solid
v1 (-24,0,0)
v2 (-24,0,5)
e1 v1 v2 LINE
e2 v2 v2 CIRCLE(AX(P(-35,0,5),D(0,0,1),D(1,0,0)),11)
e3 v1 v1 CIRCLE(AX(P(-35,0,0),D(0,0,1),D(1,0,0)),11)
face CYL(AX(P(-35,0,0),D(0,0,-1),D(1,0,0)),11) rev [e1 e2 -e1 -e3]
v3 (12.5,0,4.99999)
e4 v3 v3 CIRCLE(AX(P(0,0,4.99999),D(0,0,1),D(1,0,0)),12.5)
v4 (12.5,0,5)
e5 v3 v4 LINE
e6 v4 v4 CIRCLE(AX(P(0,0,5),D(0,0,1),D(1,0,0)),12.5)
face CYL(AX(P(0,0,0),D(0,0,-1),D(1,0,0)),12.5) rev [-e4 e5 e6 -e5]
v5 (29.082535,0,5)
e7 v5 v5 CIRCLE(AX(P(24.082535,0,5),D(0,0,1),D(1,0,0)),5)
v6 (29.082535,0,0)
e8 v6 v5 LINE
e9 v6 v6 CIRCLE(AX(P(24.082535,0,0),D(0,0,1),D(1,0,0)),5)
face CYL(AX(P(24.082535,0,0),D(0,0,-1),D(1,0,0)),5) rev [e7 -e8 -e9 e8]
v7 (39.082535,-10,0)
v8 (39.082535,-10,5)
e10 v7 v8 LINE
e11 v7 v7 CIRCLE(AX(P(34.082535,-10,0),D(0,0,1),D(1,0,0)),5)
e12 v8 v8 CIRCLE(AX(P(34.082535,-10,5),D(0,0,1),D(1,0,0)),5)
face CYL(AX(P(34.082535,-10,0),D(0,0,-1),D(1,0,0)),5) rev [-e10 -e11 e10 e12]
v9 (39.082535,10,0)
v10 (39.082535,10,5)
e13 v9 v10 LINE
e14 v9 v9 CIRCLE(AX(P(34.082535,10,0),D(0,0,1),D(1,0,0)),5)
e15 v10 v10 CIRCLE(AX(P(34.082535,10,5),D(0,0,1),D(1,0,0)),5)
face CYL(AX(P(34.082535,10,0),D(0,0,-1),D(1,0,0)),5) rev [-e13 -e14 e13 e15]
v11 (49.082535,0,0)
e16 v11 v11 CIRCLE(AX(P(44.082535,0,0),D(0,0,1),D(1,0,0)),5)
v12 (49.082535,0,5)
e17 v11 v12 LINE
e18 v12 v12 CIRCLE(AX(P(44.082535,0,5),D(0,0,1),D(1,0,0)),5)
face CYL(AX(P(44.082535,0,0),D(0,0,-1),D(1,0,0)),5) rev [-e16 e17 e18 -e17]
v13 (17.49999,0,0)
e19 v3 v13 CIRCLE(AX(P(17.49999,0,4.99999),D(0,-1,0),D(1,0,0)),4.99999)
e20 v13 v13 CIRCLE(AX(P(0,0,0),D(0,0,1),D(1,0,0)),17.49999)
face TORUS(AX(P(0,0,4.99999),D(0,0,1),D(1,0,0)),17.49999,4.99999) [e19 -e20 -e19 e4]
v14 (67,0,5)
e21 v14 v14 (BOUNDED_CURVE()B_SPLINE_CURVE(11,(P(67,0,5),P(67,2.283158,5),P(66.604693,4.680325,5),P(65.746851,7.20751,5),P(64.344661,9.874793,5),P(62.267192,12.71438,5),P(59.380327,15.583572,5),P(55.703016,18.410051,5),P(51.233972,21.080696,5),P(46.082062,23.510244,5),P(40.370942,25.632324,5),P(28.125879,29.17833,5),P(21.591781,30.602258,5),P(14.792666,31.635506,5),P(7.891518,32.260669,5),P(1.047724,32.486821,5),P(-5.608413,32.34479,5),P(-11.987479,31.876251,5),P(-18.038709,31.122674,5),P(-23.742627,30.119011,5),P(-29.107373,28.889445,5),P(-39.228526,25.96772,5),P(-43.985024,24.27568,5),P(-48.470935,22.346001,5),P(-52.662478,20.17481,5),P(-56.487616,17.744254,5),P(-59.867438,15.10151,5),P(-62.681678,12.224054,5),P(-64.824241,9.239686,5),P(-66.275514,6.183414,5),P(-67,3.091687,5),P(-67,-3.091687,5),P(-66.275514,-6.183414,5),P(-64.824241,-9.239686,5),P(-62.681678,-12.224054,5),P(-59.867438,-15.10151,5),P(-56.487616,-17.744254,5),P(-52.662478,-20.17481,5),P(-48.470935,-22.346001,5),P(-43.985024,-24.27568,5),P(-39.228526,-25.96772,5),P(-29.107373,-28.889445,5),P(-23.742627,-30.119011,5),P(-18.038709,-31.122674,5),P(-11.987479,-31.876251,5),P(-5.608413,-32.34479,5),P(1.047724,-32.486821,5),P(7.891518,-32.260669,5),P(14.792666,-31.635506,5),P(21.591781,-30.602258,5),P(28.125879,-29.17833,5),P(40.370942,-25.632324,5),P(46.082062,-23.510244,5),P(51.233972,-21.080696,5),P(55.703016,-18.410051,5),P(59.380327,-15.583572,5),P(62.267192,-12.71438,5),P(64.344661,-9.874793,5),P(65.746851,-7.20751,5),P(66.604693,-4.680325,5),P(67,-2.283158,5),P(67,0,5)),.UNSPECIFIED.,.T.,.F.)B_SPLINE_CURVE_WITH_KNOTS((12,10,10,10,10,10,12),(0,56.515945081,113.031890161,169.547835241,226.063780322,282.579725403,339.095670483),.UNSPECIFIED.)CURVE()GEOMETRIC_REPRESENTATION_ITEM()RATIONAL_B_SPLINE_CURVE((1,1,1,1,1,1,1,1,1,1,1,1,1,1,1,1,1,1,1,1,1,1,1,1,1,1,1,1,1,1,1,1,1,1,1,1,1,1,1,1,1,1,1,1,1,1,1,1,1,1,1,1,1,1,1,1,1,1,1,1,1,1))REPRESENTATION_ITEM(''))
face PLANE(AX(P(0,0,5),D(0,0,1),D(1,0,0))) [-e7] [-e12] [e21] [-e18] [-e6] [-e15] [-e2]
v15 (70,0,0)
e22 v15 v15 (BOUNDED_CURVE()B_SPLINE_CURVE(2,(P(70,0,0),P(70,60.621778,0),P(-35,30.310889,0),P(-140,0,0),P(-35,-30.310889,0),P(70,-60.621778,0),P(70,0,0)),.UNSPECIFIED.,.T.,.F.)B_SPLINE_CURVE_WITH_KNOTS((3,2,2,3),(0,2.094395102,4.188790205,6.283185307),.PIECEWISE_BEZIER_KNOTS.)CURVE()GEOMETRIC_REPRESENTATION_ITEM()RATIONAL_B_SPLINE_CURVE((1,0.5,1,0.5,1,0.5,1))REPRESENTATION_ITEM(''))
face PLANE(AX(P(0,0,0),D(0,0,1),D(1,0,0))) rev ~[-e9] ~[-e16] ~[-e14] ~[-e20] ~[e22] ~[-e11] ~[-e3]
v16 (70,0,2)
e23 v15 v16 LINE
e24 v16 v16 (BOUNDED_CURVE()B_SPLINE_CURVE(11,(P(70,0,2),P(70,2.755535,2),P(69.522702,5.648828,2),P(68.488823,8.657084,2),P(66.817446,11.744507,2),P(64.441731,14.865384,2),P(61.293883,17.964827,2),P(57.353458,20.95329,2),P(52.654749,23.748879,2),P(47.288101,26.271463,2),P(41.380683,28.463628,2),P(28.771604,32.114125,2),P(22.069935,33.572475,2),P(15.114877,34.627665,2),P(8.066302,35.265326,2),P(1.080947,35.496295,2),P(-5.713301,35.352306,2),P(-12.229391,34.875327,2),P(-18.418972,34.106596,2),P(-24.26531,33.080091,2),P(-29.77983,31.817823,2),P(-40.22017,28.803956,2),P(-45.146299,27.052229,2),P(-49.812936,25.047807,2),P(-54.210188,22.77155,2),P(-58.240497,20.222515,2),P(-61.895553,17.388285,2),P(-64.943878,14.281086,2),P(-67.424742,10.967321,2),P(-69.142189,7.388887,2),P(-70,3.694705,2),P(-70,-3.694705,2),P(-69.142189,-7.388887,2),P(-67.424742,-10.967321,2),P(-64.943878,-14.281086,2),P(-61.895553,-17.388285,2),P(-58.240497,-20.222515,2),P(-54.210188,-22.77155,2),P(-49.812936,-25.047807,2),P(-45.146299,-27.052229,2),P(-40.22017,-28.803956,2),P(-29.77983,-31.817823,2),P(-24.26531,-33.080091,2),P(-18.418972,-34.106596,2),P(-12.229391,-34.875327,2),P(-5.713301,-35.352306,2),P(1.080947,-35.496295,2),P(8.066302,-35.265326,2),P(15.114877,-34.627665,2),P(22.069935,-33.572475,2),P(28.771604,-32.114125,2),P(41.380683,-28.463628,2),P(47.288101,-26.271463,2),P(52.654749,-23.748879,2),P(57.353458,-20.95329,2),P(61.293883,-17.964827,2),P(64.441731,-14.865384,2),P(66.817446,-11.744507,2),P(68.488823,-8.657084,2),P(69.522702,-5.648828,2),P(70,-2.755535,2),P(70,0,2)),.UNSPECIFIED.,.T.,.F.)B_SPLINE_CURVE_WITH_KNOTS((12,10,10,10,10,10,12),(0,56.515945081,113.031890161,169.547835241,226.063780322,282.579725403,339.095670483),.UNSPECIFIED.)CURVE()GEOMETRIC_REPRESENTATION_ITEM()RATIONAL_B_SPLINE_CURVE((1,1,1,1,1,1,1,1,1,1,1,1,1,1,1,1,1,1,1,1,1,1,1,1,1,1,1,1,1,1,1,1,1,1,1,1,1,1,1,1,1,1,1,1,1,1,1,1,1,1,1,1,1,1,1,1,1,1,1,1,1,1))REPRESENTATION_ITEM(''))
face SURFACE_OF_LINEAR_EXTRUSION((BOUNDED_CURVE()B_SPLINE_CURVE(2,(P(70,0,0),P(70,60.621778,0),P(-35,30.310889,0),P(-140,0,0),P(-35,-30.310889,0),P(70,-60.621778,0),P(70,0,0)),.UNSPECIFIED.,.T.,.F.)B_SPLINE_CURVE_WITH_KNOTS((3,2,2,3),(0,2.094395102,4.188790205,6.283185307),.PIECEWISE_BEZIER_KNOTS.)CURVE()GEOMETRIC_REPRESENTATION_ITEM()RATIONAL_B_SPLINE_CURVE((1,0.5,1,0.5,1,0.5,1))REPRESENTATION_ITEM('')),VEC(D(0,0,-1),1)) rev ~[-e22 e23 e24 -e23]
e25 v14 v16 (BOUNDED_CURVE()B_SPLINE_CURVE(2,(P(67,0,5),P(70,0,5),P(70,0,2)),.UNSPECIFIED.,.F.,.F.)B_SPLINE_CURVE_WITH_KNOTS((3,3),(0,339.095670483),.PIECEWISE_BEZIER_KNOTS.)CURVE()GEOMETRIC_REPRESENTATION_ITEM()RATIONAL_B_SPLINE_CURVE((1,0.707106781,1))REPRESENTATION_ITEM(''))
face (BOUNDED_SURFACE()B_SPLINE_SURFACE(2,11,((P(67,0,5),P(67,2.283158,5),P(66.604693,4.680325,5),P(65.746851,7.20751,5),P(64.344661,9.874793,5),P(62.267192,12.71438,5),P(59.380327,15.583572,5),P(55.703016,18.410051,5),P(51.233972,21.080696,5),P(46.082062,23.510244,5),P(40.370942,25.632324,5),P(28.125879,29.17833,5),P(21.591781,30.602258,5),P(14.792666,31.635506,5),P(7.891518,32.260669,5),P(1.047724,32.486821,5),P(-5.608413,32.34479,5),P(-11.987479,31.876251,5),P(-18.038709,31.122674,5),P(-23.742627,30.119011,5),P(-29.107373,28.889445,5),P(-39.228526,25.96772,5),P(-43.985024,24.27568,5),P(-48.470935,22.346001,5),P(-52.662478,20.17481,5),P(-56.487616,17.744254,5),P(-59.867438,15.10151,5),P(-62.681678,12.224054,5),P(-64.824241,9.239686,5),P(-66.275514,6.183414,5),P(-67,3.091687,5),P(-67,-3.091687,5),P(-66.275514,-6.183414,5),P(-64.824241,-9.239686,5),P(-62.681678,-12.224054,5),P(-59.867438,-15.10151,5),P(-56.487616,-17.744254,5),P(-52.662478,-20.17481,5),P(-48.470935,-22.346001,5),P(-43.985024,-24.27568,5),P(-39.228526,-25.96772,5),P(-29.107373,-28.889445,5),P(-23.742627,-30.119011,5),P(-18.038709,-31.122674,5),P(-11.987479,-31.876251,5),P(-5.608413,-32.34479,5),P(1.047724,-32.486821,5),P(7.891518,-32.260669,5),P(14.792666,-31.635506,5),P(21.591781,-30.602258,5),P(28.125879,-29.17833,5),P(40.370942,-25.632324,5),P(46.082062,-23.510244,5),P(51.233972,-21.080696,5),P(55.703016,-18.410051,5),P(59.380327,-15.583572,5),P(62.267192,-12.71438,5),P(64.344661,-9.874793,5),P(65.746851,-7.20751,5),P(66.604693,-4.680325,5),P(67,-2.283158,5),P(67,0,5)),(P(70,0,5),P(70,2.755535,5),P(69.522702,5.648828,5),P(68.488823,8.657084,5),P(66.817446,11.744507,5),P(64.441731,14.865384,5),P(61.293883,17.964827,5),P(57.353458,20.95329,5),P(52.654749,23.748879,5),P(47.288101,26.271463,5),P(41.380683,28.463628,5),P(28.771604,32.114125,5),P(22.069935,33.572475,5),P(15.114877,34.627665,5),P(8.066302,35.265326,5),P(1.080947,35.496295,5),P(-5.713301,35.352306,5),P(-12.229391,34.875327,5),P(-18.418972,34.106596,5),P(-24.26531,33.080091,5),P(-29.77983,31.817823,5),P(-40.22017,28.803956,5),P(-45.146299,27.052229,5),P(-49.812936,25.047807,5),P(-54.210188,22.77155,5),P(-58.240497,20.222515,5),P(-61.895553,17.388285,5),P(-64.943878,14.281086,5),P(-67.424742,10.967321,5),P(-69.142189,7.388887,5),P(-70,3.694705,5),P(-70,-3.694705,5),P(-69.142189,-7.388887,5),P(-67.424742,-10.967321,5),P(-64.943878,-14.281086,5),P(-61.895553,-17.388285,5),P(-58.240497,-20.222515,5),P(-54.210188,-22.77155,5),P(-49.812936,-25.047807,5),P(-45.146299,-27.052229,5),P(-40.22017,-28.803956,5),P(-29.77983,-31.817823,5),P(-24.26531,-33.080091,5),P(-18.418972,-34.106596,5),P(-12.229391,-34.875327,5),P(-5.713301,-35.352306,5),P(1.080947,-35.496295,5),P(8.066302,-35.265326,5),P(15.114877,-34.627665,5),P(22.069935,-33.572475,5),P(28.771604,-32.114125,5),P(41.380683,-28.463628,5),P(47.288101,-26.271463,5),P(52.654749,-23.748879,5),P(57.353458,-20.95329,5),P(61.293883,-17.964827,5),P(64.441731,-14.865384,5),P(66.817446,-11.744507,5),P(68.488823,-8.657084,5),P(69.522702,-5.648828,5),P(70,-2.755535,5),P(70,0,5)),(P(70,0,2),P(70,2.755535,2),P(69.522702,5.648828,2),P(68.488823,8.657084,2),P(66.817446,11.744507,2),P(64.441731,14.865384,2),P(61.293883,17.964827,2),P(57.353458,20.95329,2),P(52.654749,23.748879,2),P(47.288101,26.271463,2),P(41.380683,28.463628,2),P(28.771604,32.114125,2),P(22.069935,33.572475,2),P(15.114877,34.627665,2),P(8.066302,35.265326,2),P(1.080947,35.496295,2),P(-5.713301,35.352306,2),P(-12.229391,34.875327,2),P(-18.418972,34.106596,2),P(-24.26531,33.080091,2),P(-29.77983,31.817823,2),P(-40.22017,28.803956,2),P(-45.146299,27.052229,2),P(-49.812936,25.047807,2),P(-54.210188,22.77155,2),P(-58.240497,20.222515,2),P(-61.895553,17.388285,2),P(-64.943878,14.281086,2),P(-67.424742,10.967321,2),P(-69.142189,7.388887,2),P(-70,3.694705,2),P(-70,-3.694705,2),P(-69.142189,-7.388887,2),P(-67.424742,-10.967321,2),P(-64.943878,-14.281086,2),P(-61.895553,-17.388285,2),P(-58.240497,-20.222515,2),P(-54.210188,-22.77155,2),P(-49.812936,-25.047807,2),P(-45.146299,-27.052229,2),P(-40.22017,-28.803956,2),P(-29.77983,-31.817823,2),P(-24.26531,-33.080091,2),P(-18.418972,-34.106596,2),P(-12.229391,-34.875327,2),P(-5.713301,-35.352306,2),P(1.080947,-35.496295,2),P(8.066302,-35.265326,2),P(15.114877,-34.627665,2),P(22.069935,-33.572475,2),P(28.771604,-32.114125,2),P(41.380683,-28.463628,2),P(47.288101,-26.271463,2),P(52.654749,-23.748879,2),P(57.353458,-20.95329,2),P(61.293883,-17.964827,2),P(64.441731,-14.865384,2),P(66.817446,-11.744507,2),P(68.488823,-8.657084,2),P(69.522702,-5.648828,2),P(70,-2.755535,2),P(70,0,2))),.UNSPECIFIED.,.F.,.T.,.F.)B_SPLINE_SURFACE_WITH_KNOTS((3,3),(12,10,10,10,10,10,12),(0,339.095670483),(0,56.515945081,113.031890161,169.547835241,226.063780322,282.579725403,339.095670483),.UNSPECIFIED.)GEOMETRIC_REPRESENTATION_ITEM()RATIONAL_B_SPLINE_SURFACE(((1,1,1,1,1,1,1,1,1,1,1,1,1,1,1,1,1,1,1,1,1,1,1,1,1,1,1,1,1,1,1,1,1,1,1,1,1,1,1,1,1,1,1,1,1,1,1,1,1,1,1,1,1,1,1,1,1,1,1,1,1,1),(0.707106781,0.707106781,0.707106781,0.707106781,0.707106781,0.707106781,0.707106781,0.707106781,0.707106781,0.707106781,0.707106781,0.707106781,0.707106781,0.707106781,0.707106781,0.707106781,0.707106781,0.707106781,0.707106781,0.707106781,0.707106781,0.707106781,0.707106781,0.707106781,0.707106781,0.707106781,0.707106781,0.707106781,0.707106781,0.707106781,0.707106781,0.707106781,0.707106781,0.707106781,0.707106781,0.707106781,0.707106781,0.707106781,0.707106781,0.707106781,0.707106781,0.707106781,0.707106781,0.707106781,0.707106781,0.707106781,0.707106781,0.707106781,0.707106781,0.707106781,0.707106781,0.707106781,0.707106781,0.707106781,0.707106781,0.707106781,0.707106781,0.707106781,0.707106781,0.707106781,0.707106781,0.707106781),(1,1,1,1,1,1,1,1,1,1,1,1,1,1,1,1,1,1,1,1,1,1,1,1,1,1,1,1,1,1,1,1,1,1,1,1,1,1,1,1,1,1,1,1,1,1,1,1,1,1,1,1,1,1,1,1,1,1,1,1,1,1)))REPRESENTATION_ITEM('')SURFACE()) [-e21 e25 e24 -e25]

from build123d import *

# Parameters (mm, degrees)
F0_R     = 5
F0_R_2   = 11
F0_R_3   = 12.5
F1_DEPTH = 5
F2_R     = 4.99999
F3_R     = 3


# Not quite as in the source:
# - a fillet or chamfer is up to 0.001 mm smaller than in the source, because OpenCascade refuses the exact size


with BuildPart() as f1:
    # F0 (on Top) → F1 (new body)
    with BuildSketch(Plane.XY):
        with BuildLine():
            add(Edge.make_bspline(
                [(70, 0), (70, 60.6217782649), (-35, 30.3108891325), (-140, 0), (-35, -30.3108891325), (70, -60.6217782649), (70, 0)],
                knots=[0, 0, 0, 2.0943951024, 2.0943951024, 4.1887902048, 4.1887902048, 6.2831853072, 6.2831853072, 6.2831853072], degree=2, weights=[1, 0.5, 1, 0.5, 1, 0.5, 1]))
        make_face()
        with Locations((34.0825345158, -10)):
            Circle(F0_R, mode=Mode.SUBTRACT)
        with Locations((-35, 0)):
            Circle(F0_R_2, mode=Mode.SUBTRACT)
        Circle(F0_R_3, mode=Mode.SUBTRACT)
        with Locations((24.0825345158, 0)):
            Circle(F0_R, mode=Mode.SUBTRACT)
        with Locations((34.0825345158, 10)):
            Circle(F0_R, mode=Mode.SUBTRACT)
        with Locations((44.0825345158, 0)):
            Circle(F0_R, mode=Mode.SUBTRACT)
    extrude(amount=F1_DEPTH)

    # F2 (radius 5 in the source; OpenCascade refuses exactly that, so slightly less here)
    f2_edges = [f1.edges().sort_by_distance(p)[0] for p in [
        (-12.5, 0, 0),
    ]]
    fillet(f2_edges, radius=F2_R)

    # F3
    f3_edges = [f1.edges().sort_by_distance(p)[0] for p in [
        (-70, 9e-06, 5),
    ]]
    fillet(f3_edges, radius=F3_R)


solid = f1.part
